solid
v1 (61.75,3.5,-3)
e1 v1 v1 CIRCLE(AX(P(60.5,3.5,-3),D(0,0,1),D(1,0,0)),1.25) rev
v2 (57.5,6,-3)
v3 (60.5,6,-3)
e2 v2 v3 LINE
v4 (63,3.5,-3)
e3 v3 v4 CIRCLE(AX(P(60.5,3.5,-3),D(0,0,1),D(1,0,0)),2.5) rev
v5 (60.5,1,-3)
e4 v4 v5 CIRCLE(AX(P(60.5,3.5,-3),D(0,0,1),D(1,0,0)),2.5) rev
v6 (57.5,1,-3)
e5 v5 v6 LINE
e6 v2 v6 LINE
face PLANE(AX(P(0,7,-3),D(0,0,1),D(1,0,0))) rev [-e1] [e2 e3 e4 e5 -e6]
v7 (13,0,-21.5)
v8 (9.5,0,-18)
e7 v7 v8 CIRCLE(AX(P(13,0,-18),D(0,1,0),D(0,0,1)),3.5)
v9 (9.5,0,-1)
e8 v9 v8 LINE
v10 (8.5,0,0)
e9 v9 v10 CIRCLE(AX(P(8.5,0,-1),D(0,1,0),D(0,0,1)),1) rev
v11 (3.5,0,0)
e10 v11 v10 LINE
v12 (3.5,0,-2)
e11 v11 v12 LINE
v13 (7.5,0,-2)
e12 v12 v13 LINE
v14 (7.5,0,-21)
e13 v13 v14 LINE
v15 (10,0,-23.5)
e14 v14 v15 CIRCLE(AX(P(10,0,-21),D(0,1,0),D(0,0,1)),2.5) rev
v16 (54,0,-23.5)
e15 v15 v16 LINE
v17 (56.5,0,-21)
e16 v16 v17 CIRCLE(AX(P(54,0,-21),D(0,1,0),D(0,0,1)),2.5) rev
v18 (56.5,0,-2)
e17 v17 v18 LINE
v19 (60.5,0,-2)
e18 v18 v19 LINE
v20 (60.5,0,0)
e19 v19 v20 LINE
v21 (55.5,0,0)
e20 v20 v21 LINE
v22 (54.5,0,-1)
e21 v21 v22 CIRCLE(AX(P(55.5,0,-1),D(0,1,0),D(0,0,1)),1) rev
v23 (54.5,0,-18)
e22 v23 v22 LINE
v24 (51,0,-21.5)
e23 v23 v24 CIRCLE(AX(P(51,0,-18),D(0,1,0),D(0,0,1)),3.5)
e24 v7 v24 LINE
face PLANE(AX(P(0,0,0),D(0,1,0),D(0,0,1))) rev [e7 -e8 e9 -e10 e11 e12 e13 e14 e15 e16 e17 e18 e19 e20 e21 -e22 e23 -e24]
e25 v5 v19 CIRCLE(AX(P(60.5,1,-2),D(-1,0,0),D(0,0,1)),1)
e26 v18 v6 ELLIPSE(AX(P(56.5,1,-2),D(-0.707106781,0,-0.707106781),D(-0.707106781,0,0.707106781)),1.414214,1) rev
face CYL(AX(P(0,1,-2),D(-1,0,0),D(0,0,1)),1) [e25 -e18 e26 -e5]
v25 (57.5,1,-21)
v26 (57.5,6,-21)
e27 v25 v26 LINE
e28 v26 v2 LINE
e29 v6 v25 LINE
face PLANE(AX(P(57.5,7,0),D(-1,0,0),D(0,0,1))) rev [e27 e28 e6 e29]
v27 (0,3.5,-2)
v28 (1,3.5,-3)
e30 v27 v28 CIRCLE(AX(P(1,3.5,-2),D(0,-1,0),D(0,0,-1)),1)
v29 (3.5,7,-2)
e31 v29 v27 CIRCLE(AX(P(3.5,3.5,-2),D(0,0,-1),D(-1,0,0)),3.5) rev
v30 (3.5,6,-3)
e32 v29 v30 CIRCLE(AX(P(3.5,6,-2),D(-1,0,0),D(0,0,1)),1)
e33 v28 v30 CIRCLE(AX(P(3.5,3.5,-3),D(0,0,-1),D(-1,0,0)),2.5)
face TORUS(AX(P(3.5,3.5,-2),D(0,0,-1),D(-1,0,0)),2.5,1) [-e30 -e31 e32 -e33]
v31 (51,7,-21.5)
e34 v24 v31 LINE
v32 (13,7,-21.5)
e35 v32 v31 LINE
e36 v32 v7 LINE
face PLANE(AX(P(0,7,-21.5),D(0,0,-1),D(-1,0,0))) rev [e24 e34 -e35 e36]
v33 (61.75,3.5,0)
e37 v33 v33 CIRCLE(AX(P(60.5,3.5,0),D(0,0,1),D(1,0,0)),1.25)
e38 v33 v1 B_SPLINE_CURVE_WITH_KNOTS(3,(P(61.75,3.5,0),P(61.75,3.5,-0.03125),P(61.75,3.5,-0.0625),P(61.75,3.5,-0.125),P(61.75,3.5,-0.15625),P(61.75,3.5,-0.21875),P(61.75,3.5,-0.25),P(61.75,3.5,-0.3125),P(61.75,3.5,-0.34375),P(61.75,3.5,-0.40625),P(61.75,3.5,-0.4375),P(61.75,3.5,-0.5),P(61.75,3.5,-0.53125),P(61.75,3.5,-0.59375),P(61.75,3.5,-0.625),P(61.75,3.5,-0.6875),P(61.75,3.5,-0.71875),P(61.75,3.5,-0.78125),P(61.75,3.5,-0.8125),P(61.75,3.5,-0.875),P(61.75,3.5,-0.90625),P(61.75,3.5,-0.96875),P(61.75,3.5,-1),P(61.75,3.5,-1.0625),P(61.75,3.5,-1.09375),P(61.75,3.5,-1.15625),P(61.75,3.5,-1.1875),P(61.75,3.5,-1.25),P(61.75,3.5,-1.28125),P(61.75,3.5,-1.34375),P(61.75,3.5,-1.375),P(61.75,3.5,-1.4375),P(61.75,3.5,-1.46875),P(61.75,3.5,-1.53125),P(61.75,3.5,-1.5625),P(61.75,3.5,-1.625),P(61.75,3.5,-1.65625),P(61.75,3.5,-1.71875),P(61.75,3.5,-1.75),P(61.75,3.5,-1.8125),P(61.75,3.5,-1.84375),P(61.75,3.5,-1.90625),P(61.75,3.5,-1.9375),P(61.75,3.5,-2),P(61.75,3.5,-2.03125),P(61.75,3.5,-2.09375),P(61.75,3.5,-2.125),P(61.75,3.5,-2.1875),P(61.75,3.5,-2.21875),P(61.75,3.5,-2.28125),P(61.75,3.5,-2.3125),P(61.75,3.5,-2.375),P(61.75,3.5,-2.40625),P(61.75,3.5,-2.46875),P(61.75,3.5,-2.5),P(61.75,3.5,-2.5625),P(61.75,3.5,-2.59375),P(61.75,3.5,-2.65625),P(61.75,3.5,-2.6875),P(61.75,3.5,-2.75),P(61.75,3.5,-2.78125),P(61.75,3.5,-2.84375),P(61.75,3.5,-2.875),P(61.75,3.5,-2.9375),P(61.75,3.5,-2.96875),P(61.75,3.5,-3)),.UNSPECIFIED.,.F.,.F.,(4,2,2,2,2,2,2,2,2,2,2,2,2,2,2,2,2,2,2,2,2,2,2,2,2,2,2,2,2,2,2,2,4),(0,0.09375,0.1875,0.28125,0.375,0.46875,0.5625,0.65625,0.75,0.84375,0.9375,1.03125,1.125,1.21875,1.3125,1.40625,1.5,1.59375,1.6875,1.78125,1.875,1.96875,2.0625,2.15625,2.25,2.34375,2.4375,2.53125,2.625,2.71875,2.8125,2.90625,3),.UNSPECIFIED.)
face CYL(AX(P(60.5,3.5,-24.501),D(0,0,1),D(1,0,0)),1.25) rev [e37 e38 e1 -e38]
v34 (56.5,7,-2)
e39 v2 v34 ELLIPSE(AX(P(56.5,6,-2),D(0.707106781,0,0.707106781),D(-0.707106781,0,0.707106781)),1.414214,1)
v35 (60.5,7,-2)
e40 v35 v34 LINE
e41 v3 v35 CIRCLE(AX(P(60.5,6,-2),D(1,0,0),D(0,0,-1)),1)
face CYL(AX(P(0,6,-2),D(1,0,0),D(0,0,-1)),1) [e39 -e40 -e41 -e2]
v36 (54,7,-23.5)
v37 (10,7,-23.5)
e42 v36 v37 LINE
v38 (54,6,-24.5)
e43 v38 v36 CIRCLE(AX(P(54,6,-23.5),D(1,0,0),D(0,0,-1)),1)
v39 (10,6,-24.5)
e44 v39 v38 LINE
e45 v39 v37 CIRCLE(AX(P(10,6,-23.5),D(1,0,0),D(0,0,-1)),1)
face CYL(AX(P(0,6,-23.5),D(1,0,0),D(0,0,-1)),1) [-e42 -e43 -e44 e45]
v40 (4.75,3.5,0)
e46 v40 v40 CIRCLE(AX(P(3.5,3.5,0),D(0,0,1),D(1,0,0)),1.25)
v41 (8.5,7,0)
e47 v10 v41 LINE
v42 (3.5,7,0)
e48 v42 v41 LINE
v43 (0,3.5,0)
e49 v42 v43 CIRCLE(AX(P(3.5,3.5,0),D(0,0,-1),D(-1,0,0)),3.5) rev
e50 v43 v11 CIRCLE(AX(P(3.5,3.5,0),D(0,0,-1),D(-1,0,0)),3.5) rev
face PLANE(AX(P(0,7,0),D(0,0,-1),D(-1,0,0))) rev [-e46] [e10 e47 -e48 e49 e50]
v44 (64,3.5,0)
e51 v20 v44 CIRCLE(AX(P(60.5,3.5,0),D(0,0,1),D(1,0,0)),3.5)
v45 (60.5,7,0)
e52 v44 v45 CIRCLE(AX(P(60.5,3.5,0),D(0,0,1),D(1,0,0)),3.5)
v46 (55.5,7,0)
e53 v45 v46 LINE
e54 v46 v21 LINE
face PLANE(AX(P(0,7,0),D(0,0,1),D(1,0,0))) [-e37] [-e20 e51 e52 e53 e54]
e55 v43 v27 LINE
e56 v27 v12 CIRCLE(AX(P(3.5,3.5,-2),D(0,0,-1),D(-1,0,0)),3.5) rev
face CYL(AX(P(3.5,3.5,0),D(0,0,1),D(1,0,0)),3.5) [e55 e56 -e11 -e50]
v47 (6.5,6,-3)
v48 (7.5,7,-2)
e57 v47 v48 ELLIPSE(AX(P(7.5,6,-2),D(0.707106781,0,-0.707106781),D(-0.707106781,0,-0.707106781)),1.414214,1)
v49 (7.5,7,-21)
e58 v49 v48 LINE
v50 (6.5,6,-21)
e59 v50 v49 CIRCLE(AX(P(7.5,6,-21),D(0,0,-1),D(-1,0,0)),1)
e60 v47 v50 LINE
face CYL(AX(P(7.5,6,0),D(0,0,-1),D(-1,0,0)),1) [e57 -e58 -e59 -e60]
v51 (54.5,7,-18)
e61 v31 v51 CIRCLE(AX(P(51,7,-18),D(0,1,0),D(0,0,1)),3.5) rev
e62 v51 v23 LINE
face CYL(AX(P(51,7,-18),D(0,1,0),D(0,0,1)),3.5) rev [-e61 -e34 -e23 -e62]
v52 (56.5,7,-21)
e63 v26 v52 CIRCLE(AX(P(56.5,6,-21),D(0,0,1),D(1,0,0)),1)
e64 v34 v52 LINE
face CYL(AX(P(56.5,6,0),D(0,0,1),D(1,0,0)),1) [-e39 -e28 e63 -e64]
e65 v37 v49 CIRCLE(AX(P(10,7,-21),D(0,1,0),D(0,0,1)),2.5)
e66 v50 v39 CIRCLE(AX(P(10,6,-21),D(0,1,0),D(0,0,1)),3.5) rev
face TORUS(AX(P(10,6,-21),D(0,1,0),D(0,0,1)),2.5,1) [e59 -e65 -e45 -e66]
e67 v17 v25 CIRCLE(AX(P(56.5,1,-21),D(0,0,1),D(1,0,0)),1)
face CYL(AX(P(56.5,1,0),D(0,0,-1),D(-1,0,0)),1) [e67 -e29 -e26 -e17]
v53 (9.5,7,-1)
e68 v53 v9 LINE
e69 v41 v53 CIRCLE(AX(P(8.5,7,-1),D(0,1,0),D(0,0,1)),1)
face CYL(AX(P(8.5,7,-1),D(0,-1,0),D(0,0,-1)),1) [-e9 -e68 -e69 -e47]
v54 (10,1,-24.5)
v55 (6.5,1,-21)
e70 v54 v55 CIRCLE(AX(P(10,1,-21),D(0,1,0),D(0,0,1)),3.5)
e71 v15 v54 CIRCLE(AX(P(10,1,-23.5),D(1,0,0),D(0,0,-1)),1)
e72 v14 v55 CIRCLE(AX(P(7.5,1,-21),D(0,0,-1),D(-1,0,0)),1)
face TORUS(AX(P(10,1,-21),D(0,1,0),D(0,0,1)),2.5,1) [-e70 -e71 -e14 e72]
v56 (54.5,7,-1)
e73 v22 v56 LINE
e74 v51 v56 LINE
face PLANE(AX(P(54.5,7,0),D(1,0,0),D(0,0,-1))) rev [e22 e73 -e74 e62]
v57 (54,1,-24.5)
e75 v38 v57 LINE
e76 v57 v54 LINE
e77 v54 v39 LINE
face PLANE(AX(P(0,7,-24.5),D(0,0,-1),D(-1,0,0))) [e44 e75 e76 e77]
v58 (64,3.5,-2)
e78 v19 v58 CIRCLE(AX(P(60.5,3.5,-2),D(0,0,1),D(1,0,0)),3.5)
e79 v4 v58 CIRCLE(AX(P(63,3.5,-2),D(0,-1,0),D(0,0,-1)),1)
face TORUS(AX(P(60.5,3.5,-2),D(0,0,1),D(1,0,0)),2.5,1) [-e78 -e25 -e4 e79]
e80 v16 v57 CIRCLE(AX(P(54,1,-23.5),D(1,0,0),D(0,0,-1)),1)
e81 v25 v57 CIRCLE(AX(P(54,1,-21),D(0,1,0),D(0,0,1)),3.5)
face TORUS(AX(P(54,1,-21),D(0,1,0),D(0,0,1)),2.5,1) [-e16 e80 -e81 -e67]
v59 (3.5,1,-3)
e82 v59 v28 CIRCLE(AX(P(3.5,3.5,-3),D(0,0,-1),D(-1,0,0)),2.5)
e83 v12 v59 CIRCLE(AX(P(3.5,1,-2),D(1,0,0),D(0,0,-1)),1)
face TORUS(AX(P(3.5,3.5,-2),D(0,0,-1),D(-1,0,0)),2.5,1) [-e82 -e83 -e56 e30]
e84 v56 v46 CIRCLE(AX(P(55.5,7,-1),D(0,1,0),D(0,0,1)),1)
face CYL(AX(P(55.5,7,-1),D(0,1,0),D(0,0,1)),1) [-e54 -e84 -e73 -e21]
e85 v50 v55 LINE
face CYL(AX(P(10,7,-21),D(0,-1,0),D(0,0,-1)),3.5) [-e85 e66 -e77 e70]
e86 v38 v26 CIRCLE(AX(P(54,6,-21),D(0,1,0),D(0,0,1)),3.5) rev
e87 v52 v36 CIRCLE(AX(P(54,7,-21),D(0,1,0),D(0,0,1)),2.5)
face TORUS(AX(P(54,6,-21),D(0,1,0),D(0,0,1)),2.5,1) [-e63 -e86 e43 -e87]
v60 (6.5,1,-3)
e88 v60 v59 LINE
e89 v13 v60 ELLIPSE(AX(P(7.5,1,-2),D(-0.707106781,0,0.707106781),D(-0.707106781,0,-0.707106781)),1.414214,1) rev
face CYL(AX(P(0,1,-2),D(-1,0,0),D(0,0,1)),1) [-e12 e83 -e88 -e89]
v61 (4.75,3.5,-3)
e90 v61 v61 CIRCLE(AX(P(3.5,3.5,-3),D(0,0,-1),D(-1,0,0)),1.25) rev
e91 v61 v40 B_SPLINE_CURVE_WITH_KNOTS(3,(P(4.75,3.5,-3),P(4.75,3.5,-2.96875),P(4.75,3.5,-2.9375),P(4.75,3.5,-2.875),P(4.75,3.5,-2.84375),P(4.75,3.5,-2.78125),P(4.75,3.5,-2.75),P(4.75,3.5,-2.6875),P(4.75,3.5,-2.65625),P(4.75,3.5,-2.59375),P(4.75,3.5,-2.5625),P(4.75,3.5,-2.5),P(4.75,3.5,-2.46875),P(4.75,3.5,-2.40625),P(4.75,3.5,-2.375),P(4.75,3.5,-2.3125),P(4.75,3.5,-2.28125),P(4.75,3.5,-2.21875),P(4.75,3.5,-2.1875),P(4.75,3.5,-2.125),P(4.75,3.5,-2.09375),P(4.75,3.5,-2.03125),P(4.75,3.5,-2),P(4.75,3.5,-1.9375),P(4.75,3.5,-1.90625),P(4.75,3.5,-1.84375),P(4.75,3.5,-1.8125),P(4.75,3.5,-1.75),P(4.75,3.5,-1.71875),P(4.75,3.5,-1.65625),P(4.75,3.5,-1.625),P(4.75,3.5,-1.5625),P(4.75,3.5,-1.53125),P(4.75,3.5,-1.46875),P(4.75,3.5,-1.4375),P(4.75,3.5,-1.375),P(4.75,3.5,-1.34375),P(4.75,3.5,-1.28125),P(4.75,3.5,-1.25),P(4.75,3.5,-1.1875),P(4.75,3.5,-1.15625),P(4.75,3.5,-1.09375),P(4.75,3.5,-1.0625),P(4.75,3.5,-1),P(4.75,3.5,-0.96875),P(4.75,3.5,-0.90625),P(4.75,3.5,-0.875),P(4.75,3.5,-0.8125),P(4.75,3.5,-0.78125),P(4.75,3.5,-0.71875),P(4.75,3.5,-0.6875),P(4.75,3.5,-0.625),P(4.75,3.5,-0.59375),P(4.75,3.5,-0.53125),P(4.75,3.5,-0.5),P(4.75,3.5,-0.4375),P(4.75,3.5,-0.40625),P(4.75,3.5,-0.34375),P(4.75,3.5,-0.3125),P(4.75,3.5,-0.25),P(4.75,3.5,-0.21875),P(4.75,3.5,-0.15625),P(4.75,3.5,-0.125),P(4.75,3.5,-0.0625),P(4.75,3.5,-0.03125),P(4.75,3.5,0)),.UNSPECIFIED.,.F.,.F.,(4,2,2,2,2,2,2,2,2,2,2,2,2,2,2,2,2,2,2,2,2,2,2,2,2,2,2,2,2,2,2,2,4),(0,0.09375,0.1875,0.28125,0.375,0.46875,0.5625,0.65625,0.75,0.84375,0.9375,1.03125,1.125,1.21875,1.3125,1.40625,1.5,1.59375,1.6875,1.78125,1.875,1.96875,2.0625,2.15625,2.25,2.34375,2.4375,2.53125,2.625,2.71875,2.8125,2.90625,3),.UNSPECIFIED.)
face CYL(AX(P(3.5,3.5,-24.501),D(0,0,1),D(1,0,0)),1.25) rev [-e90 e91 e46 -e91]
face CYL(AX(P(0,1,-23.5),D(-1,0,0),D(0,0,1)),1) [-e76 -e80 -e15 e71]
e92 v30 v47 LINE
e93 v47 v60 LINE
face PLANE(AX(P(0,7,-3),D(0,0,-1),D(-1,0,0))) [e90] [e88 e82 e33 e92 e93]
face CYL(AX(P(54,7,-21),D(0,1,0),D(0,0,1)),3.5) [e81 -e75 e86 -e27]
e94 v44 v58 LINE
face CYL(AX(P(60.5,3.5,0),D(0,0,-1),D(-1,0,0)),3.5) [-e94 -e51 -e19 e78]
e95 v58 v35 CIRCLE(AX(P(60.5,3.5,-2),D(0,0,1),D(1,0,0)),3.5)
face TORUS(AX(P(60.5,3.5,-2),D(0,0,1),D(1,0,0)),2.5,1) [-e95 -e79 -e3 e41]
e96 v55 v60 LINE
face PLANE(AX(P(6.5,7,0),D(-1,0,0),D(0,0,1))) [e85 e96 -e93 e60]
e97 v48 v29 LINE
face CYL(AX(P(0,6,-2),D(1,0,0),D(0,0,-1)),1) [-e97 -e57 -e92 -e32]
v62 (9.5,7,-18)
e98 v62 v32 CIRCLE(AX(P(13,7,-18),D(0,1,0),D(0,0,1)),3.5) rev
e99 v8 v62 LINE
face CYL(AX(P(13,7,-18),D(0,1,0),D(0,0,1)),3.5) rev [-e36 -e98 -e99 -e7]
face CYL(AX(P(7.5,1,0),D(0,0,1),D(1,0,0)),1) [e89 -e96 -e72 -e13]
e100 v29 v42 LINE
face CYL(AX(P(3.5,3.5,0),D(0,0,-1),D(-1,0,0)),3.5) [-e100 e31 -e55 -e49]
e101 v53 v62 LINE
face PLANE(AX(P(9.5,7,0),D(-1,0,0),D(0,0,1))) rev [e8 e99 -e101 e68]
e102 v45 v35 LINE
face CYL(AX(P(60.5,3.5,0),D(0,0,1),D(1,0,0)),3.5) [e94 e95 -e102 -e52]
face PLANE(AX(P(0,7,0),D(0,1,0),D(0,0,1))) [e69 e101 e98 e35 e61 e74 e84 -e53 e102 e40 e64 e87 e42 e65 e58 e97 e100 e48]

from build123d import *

# Parameters (mm, degrees)
SKETCH_1_W          = 6.5
SKETCH_1_H          = 3
SKETCH_1_W_2        = 22.5
EXTRUDE_1_DEPTH     = 7
FILLET_3_R          = 3.5
CUT_EXTRUDE_1_REACH = 70.886
SKETCH_2_R          = 1.25
FILLET_4_R          = 1
FILLET_5_R          = 1


with BuildPart() as part:
    # Эскиз1 → Бобышка-Вытянуть1 (new body)
    with BuildSketch(Plane(origin=(0, 0, 0), x_dir=(1, 0, 0), z_dir=(0, 1, 0))):
        with Locations((3.25, 1.5)):
            Rectangle(SKETCH_1_W, SKETCH_1_H)
        Polygon((9.5, 21.5), (9.5, 24.5), (6.5, 24.5), (6.5, 3), (6.5, 0), (9.5, 0), align=None)
        with Locations((20.75, 23)):
            Rectangle(SKETCH_1_W_2, SKETCH_1_H)
        with Locations((43.25, 23)):
            Rectangle(SKETCH_1_W_2, SKETCH_1_H)
        Polygon((57.5, 24.5), (54.5, 24.5), (54.5, 21.5), (54.5, 0), (57.5, 0), (57.5, 3), align=None)
        with Locations((60.75, 1.5)):
            Rectangle(SKETCH_1_W, SKETCH_1_H)
    extrude(amount=EXTRUDE_1_DEPTH)

    # Скругление3
    fillet_3_edges = [part.edges().sort_by_distance(p)[0] for p in [
        (64, 0, -1.5),
        (64, 7, -1.5),
        (0, 0, -1.5),
        (0, 7, -1.5),
        (57.5, 3.5, -24.5),
        (6.5, 3.5, -24.5),
        (54.5, 3.5, -21.5),
        (9.5, 3.5, -21.5),
    ]]
    fillet(fillet_3_edges, radius=FILLET_3_R - 0.0001)  # a hair under: the kernel refuses the full size

    # Эскиз2 → Вырез-Вытянуть1 (cut, up to next)
    with BuildSketch(Plane.XY, mode=Mode.PRIVATE) as cut_extrude_1_sk1:
        with Locations((3.5, 3.5)):
            Circle(SKETCH_2_R)
    cut_extrude_1_tool1 = extrude(cut_extrude_1_sk1.sketch, amount=-CUT_EXTRUDE_1_REACH, mode=Mode.PRIVATE) & part.part
    # Эскиз2 → Вырез-Вытянуть1 (cut, up to next)
    with BuildSketch(Plane.XY, mode=Mode.PRIVATE) as cut_extrude_1_sk2:
        with Locations((60.5, 3.5)):
            Circle(SKETCH_2_R)
    cut_extrude_1_tool2 = extrude(cut_extrude_1_sk2.sketch, amount=-CUT_EXTRUDE_1_REACH, mode=Mode.PRIVATE) & part.part
    add(cut_extrude_1_tool1.solids().sort_by_distance((3.5, 3.5, 0))[0], mode=Mode.SUBTRACT)
    add(cut_extrude_1_tool2.solids().sort_by_distance((60.5, 3.5, 0))[0], mode=Mode.SUBTRACT)

    # Скругление4
    fillet_4_edges = [part.edges().sort_by_distance(p)[0] for p in [
        (6.5, 0, -12.00005),
        (57.5, 0, -12.00005),
        (57.5, 7, -12.00005),
        (59.00005, 7, -3),
        (32, 7, -24.5),
        (4.99995, 7, -3),
        (7.525096977, 7, -23.474903023),
        (56.474903023, 7, -23.474903023),
        (59.00005, 0, -3),
        (62.974903023, 1.025096977, -3),
        (62.974903023, 5.974903023, -3),
        (6.5, 7, -12.00005),
        (4.99995, 0, -3),
        (32, 0, -24.5),
        (7.525096977, 0, -23.474903023),
        (56.474903023, 0, -23.474903023),
        (1.025096977, 5.974903023, -3),
        (1.025096977, 1.025096977, -3),
    ]]
    fillet(fillet_4_edges, radius=FILLET_4_R)

    # Скругление5
    fillet_5_edges = [part.edges().sort_by_distance(p)[0] for p in [
        (54.5, 3.5, 0),
        (9.5, 3.5, 0),
    ]]
    fillet(fillet_5_edges, radius=FILLET_5_R)


solid = part.part
